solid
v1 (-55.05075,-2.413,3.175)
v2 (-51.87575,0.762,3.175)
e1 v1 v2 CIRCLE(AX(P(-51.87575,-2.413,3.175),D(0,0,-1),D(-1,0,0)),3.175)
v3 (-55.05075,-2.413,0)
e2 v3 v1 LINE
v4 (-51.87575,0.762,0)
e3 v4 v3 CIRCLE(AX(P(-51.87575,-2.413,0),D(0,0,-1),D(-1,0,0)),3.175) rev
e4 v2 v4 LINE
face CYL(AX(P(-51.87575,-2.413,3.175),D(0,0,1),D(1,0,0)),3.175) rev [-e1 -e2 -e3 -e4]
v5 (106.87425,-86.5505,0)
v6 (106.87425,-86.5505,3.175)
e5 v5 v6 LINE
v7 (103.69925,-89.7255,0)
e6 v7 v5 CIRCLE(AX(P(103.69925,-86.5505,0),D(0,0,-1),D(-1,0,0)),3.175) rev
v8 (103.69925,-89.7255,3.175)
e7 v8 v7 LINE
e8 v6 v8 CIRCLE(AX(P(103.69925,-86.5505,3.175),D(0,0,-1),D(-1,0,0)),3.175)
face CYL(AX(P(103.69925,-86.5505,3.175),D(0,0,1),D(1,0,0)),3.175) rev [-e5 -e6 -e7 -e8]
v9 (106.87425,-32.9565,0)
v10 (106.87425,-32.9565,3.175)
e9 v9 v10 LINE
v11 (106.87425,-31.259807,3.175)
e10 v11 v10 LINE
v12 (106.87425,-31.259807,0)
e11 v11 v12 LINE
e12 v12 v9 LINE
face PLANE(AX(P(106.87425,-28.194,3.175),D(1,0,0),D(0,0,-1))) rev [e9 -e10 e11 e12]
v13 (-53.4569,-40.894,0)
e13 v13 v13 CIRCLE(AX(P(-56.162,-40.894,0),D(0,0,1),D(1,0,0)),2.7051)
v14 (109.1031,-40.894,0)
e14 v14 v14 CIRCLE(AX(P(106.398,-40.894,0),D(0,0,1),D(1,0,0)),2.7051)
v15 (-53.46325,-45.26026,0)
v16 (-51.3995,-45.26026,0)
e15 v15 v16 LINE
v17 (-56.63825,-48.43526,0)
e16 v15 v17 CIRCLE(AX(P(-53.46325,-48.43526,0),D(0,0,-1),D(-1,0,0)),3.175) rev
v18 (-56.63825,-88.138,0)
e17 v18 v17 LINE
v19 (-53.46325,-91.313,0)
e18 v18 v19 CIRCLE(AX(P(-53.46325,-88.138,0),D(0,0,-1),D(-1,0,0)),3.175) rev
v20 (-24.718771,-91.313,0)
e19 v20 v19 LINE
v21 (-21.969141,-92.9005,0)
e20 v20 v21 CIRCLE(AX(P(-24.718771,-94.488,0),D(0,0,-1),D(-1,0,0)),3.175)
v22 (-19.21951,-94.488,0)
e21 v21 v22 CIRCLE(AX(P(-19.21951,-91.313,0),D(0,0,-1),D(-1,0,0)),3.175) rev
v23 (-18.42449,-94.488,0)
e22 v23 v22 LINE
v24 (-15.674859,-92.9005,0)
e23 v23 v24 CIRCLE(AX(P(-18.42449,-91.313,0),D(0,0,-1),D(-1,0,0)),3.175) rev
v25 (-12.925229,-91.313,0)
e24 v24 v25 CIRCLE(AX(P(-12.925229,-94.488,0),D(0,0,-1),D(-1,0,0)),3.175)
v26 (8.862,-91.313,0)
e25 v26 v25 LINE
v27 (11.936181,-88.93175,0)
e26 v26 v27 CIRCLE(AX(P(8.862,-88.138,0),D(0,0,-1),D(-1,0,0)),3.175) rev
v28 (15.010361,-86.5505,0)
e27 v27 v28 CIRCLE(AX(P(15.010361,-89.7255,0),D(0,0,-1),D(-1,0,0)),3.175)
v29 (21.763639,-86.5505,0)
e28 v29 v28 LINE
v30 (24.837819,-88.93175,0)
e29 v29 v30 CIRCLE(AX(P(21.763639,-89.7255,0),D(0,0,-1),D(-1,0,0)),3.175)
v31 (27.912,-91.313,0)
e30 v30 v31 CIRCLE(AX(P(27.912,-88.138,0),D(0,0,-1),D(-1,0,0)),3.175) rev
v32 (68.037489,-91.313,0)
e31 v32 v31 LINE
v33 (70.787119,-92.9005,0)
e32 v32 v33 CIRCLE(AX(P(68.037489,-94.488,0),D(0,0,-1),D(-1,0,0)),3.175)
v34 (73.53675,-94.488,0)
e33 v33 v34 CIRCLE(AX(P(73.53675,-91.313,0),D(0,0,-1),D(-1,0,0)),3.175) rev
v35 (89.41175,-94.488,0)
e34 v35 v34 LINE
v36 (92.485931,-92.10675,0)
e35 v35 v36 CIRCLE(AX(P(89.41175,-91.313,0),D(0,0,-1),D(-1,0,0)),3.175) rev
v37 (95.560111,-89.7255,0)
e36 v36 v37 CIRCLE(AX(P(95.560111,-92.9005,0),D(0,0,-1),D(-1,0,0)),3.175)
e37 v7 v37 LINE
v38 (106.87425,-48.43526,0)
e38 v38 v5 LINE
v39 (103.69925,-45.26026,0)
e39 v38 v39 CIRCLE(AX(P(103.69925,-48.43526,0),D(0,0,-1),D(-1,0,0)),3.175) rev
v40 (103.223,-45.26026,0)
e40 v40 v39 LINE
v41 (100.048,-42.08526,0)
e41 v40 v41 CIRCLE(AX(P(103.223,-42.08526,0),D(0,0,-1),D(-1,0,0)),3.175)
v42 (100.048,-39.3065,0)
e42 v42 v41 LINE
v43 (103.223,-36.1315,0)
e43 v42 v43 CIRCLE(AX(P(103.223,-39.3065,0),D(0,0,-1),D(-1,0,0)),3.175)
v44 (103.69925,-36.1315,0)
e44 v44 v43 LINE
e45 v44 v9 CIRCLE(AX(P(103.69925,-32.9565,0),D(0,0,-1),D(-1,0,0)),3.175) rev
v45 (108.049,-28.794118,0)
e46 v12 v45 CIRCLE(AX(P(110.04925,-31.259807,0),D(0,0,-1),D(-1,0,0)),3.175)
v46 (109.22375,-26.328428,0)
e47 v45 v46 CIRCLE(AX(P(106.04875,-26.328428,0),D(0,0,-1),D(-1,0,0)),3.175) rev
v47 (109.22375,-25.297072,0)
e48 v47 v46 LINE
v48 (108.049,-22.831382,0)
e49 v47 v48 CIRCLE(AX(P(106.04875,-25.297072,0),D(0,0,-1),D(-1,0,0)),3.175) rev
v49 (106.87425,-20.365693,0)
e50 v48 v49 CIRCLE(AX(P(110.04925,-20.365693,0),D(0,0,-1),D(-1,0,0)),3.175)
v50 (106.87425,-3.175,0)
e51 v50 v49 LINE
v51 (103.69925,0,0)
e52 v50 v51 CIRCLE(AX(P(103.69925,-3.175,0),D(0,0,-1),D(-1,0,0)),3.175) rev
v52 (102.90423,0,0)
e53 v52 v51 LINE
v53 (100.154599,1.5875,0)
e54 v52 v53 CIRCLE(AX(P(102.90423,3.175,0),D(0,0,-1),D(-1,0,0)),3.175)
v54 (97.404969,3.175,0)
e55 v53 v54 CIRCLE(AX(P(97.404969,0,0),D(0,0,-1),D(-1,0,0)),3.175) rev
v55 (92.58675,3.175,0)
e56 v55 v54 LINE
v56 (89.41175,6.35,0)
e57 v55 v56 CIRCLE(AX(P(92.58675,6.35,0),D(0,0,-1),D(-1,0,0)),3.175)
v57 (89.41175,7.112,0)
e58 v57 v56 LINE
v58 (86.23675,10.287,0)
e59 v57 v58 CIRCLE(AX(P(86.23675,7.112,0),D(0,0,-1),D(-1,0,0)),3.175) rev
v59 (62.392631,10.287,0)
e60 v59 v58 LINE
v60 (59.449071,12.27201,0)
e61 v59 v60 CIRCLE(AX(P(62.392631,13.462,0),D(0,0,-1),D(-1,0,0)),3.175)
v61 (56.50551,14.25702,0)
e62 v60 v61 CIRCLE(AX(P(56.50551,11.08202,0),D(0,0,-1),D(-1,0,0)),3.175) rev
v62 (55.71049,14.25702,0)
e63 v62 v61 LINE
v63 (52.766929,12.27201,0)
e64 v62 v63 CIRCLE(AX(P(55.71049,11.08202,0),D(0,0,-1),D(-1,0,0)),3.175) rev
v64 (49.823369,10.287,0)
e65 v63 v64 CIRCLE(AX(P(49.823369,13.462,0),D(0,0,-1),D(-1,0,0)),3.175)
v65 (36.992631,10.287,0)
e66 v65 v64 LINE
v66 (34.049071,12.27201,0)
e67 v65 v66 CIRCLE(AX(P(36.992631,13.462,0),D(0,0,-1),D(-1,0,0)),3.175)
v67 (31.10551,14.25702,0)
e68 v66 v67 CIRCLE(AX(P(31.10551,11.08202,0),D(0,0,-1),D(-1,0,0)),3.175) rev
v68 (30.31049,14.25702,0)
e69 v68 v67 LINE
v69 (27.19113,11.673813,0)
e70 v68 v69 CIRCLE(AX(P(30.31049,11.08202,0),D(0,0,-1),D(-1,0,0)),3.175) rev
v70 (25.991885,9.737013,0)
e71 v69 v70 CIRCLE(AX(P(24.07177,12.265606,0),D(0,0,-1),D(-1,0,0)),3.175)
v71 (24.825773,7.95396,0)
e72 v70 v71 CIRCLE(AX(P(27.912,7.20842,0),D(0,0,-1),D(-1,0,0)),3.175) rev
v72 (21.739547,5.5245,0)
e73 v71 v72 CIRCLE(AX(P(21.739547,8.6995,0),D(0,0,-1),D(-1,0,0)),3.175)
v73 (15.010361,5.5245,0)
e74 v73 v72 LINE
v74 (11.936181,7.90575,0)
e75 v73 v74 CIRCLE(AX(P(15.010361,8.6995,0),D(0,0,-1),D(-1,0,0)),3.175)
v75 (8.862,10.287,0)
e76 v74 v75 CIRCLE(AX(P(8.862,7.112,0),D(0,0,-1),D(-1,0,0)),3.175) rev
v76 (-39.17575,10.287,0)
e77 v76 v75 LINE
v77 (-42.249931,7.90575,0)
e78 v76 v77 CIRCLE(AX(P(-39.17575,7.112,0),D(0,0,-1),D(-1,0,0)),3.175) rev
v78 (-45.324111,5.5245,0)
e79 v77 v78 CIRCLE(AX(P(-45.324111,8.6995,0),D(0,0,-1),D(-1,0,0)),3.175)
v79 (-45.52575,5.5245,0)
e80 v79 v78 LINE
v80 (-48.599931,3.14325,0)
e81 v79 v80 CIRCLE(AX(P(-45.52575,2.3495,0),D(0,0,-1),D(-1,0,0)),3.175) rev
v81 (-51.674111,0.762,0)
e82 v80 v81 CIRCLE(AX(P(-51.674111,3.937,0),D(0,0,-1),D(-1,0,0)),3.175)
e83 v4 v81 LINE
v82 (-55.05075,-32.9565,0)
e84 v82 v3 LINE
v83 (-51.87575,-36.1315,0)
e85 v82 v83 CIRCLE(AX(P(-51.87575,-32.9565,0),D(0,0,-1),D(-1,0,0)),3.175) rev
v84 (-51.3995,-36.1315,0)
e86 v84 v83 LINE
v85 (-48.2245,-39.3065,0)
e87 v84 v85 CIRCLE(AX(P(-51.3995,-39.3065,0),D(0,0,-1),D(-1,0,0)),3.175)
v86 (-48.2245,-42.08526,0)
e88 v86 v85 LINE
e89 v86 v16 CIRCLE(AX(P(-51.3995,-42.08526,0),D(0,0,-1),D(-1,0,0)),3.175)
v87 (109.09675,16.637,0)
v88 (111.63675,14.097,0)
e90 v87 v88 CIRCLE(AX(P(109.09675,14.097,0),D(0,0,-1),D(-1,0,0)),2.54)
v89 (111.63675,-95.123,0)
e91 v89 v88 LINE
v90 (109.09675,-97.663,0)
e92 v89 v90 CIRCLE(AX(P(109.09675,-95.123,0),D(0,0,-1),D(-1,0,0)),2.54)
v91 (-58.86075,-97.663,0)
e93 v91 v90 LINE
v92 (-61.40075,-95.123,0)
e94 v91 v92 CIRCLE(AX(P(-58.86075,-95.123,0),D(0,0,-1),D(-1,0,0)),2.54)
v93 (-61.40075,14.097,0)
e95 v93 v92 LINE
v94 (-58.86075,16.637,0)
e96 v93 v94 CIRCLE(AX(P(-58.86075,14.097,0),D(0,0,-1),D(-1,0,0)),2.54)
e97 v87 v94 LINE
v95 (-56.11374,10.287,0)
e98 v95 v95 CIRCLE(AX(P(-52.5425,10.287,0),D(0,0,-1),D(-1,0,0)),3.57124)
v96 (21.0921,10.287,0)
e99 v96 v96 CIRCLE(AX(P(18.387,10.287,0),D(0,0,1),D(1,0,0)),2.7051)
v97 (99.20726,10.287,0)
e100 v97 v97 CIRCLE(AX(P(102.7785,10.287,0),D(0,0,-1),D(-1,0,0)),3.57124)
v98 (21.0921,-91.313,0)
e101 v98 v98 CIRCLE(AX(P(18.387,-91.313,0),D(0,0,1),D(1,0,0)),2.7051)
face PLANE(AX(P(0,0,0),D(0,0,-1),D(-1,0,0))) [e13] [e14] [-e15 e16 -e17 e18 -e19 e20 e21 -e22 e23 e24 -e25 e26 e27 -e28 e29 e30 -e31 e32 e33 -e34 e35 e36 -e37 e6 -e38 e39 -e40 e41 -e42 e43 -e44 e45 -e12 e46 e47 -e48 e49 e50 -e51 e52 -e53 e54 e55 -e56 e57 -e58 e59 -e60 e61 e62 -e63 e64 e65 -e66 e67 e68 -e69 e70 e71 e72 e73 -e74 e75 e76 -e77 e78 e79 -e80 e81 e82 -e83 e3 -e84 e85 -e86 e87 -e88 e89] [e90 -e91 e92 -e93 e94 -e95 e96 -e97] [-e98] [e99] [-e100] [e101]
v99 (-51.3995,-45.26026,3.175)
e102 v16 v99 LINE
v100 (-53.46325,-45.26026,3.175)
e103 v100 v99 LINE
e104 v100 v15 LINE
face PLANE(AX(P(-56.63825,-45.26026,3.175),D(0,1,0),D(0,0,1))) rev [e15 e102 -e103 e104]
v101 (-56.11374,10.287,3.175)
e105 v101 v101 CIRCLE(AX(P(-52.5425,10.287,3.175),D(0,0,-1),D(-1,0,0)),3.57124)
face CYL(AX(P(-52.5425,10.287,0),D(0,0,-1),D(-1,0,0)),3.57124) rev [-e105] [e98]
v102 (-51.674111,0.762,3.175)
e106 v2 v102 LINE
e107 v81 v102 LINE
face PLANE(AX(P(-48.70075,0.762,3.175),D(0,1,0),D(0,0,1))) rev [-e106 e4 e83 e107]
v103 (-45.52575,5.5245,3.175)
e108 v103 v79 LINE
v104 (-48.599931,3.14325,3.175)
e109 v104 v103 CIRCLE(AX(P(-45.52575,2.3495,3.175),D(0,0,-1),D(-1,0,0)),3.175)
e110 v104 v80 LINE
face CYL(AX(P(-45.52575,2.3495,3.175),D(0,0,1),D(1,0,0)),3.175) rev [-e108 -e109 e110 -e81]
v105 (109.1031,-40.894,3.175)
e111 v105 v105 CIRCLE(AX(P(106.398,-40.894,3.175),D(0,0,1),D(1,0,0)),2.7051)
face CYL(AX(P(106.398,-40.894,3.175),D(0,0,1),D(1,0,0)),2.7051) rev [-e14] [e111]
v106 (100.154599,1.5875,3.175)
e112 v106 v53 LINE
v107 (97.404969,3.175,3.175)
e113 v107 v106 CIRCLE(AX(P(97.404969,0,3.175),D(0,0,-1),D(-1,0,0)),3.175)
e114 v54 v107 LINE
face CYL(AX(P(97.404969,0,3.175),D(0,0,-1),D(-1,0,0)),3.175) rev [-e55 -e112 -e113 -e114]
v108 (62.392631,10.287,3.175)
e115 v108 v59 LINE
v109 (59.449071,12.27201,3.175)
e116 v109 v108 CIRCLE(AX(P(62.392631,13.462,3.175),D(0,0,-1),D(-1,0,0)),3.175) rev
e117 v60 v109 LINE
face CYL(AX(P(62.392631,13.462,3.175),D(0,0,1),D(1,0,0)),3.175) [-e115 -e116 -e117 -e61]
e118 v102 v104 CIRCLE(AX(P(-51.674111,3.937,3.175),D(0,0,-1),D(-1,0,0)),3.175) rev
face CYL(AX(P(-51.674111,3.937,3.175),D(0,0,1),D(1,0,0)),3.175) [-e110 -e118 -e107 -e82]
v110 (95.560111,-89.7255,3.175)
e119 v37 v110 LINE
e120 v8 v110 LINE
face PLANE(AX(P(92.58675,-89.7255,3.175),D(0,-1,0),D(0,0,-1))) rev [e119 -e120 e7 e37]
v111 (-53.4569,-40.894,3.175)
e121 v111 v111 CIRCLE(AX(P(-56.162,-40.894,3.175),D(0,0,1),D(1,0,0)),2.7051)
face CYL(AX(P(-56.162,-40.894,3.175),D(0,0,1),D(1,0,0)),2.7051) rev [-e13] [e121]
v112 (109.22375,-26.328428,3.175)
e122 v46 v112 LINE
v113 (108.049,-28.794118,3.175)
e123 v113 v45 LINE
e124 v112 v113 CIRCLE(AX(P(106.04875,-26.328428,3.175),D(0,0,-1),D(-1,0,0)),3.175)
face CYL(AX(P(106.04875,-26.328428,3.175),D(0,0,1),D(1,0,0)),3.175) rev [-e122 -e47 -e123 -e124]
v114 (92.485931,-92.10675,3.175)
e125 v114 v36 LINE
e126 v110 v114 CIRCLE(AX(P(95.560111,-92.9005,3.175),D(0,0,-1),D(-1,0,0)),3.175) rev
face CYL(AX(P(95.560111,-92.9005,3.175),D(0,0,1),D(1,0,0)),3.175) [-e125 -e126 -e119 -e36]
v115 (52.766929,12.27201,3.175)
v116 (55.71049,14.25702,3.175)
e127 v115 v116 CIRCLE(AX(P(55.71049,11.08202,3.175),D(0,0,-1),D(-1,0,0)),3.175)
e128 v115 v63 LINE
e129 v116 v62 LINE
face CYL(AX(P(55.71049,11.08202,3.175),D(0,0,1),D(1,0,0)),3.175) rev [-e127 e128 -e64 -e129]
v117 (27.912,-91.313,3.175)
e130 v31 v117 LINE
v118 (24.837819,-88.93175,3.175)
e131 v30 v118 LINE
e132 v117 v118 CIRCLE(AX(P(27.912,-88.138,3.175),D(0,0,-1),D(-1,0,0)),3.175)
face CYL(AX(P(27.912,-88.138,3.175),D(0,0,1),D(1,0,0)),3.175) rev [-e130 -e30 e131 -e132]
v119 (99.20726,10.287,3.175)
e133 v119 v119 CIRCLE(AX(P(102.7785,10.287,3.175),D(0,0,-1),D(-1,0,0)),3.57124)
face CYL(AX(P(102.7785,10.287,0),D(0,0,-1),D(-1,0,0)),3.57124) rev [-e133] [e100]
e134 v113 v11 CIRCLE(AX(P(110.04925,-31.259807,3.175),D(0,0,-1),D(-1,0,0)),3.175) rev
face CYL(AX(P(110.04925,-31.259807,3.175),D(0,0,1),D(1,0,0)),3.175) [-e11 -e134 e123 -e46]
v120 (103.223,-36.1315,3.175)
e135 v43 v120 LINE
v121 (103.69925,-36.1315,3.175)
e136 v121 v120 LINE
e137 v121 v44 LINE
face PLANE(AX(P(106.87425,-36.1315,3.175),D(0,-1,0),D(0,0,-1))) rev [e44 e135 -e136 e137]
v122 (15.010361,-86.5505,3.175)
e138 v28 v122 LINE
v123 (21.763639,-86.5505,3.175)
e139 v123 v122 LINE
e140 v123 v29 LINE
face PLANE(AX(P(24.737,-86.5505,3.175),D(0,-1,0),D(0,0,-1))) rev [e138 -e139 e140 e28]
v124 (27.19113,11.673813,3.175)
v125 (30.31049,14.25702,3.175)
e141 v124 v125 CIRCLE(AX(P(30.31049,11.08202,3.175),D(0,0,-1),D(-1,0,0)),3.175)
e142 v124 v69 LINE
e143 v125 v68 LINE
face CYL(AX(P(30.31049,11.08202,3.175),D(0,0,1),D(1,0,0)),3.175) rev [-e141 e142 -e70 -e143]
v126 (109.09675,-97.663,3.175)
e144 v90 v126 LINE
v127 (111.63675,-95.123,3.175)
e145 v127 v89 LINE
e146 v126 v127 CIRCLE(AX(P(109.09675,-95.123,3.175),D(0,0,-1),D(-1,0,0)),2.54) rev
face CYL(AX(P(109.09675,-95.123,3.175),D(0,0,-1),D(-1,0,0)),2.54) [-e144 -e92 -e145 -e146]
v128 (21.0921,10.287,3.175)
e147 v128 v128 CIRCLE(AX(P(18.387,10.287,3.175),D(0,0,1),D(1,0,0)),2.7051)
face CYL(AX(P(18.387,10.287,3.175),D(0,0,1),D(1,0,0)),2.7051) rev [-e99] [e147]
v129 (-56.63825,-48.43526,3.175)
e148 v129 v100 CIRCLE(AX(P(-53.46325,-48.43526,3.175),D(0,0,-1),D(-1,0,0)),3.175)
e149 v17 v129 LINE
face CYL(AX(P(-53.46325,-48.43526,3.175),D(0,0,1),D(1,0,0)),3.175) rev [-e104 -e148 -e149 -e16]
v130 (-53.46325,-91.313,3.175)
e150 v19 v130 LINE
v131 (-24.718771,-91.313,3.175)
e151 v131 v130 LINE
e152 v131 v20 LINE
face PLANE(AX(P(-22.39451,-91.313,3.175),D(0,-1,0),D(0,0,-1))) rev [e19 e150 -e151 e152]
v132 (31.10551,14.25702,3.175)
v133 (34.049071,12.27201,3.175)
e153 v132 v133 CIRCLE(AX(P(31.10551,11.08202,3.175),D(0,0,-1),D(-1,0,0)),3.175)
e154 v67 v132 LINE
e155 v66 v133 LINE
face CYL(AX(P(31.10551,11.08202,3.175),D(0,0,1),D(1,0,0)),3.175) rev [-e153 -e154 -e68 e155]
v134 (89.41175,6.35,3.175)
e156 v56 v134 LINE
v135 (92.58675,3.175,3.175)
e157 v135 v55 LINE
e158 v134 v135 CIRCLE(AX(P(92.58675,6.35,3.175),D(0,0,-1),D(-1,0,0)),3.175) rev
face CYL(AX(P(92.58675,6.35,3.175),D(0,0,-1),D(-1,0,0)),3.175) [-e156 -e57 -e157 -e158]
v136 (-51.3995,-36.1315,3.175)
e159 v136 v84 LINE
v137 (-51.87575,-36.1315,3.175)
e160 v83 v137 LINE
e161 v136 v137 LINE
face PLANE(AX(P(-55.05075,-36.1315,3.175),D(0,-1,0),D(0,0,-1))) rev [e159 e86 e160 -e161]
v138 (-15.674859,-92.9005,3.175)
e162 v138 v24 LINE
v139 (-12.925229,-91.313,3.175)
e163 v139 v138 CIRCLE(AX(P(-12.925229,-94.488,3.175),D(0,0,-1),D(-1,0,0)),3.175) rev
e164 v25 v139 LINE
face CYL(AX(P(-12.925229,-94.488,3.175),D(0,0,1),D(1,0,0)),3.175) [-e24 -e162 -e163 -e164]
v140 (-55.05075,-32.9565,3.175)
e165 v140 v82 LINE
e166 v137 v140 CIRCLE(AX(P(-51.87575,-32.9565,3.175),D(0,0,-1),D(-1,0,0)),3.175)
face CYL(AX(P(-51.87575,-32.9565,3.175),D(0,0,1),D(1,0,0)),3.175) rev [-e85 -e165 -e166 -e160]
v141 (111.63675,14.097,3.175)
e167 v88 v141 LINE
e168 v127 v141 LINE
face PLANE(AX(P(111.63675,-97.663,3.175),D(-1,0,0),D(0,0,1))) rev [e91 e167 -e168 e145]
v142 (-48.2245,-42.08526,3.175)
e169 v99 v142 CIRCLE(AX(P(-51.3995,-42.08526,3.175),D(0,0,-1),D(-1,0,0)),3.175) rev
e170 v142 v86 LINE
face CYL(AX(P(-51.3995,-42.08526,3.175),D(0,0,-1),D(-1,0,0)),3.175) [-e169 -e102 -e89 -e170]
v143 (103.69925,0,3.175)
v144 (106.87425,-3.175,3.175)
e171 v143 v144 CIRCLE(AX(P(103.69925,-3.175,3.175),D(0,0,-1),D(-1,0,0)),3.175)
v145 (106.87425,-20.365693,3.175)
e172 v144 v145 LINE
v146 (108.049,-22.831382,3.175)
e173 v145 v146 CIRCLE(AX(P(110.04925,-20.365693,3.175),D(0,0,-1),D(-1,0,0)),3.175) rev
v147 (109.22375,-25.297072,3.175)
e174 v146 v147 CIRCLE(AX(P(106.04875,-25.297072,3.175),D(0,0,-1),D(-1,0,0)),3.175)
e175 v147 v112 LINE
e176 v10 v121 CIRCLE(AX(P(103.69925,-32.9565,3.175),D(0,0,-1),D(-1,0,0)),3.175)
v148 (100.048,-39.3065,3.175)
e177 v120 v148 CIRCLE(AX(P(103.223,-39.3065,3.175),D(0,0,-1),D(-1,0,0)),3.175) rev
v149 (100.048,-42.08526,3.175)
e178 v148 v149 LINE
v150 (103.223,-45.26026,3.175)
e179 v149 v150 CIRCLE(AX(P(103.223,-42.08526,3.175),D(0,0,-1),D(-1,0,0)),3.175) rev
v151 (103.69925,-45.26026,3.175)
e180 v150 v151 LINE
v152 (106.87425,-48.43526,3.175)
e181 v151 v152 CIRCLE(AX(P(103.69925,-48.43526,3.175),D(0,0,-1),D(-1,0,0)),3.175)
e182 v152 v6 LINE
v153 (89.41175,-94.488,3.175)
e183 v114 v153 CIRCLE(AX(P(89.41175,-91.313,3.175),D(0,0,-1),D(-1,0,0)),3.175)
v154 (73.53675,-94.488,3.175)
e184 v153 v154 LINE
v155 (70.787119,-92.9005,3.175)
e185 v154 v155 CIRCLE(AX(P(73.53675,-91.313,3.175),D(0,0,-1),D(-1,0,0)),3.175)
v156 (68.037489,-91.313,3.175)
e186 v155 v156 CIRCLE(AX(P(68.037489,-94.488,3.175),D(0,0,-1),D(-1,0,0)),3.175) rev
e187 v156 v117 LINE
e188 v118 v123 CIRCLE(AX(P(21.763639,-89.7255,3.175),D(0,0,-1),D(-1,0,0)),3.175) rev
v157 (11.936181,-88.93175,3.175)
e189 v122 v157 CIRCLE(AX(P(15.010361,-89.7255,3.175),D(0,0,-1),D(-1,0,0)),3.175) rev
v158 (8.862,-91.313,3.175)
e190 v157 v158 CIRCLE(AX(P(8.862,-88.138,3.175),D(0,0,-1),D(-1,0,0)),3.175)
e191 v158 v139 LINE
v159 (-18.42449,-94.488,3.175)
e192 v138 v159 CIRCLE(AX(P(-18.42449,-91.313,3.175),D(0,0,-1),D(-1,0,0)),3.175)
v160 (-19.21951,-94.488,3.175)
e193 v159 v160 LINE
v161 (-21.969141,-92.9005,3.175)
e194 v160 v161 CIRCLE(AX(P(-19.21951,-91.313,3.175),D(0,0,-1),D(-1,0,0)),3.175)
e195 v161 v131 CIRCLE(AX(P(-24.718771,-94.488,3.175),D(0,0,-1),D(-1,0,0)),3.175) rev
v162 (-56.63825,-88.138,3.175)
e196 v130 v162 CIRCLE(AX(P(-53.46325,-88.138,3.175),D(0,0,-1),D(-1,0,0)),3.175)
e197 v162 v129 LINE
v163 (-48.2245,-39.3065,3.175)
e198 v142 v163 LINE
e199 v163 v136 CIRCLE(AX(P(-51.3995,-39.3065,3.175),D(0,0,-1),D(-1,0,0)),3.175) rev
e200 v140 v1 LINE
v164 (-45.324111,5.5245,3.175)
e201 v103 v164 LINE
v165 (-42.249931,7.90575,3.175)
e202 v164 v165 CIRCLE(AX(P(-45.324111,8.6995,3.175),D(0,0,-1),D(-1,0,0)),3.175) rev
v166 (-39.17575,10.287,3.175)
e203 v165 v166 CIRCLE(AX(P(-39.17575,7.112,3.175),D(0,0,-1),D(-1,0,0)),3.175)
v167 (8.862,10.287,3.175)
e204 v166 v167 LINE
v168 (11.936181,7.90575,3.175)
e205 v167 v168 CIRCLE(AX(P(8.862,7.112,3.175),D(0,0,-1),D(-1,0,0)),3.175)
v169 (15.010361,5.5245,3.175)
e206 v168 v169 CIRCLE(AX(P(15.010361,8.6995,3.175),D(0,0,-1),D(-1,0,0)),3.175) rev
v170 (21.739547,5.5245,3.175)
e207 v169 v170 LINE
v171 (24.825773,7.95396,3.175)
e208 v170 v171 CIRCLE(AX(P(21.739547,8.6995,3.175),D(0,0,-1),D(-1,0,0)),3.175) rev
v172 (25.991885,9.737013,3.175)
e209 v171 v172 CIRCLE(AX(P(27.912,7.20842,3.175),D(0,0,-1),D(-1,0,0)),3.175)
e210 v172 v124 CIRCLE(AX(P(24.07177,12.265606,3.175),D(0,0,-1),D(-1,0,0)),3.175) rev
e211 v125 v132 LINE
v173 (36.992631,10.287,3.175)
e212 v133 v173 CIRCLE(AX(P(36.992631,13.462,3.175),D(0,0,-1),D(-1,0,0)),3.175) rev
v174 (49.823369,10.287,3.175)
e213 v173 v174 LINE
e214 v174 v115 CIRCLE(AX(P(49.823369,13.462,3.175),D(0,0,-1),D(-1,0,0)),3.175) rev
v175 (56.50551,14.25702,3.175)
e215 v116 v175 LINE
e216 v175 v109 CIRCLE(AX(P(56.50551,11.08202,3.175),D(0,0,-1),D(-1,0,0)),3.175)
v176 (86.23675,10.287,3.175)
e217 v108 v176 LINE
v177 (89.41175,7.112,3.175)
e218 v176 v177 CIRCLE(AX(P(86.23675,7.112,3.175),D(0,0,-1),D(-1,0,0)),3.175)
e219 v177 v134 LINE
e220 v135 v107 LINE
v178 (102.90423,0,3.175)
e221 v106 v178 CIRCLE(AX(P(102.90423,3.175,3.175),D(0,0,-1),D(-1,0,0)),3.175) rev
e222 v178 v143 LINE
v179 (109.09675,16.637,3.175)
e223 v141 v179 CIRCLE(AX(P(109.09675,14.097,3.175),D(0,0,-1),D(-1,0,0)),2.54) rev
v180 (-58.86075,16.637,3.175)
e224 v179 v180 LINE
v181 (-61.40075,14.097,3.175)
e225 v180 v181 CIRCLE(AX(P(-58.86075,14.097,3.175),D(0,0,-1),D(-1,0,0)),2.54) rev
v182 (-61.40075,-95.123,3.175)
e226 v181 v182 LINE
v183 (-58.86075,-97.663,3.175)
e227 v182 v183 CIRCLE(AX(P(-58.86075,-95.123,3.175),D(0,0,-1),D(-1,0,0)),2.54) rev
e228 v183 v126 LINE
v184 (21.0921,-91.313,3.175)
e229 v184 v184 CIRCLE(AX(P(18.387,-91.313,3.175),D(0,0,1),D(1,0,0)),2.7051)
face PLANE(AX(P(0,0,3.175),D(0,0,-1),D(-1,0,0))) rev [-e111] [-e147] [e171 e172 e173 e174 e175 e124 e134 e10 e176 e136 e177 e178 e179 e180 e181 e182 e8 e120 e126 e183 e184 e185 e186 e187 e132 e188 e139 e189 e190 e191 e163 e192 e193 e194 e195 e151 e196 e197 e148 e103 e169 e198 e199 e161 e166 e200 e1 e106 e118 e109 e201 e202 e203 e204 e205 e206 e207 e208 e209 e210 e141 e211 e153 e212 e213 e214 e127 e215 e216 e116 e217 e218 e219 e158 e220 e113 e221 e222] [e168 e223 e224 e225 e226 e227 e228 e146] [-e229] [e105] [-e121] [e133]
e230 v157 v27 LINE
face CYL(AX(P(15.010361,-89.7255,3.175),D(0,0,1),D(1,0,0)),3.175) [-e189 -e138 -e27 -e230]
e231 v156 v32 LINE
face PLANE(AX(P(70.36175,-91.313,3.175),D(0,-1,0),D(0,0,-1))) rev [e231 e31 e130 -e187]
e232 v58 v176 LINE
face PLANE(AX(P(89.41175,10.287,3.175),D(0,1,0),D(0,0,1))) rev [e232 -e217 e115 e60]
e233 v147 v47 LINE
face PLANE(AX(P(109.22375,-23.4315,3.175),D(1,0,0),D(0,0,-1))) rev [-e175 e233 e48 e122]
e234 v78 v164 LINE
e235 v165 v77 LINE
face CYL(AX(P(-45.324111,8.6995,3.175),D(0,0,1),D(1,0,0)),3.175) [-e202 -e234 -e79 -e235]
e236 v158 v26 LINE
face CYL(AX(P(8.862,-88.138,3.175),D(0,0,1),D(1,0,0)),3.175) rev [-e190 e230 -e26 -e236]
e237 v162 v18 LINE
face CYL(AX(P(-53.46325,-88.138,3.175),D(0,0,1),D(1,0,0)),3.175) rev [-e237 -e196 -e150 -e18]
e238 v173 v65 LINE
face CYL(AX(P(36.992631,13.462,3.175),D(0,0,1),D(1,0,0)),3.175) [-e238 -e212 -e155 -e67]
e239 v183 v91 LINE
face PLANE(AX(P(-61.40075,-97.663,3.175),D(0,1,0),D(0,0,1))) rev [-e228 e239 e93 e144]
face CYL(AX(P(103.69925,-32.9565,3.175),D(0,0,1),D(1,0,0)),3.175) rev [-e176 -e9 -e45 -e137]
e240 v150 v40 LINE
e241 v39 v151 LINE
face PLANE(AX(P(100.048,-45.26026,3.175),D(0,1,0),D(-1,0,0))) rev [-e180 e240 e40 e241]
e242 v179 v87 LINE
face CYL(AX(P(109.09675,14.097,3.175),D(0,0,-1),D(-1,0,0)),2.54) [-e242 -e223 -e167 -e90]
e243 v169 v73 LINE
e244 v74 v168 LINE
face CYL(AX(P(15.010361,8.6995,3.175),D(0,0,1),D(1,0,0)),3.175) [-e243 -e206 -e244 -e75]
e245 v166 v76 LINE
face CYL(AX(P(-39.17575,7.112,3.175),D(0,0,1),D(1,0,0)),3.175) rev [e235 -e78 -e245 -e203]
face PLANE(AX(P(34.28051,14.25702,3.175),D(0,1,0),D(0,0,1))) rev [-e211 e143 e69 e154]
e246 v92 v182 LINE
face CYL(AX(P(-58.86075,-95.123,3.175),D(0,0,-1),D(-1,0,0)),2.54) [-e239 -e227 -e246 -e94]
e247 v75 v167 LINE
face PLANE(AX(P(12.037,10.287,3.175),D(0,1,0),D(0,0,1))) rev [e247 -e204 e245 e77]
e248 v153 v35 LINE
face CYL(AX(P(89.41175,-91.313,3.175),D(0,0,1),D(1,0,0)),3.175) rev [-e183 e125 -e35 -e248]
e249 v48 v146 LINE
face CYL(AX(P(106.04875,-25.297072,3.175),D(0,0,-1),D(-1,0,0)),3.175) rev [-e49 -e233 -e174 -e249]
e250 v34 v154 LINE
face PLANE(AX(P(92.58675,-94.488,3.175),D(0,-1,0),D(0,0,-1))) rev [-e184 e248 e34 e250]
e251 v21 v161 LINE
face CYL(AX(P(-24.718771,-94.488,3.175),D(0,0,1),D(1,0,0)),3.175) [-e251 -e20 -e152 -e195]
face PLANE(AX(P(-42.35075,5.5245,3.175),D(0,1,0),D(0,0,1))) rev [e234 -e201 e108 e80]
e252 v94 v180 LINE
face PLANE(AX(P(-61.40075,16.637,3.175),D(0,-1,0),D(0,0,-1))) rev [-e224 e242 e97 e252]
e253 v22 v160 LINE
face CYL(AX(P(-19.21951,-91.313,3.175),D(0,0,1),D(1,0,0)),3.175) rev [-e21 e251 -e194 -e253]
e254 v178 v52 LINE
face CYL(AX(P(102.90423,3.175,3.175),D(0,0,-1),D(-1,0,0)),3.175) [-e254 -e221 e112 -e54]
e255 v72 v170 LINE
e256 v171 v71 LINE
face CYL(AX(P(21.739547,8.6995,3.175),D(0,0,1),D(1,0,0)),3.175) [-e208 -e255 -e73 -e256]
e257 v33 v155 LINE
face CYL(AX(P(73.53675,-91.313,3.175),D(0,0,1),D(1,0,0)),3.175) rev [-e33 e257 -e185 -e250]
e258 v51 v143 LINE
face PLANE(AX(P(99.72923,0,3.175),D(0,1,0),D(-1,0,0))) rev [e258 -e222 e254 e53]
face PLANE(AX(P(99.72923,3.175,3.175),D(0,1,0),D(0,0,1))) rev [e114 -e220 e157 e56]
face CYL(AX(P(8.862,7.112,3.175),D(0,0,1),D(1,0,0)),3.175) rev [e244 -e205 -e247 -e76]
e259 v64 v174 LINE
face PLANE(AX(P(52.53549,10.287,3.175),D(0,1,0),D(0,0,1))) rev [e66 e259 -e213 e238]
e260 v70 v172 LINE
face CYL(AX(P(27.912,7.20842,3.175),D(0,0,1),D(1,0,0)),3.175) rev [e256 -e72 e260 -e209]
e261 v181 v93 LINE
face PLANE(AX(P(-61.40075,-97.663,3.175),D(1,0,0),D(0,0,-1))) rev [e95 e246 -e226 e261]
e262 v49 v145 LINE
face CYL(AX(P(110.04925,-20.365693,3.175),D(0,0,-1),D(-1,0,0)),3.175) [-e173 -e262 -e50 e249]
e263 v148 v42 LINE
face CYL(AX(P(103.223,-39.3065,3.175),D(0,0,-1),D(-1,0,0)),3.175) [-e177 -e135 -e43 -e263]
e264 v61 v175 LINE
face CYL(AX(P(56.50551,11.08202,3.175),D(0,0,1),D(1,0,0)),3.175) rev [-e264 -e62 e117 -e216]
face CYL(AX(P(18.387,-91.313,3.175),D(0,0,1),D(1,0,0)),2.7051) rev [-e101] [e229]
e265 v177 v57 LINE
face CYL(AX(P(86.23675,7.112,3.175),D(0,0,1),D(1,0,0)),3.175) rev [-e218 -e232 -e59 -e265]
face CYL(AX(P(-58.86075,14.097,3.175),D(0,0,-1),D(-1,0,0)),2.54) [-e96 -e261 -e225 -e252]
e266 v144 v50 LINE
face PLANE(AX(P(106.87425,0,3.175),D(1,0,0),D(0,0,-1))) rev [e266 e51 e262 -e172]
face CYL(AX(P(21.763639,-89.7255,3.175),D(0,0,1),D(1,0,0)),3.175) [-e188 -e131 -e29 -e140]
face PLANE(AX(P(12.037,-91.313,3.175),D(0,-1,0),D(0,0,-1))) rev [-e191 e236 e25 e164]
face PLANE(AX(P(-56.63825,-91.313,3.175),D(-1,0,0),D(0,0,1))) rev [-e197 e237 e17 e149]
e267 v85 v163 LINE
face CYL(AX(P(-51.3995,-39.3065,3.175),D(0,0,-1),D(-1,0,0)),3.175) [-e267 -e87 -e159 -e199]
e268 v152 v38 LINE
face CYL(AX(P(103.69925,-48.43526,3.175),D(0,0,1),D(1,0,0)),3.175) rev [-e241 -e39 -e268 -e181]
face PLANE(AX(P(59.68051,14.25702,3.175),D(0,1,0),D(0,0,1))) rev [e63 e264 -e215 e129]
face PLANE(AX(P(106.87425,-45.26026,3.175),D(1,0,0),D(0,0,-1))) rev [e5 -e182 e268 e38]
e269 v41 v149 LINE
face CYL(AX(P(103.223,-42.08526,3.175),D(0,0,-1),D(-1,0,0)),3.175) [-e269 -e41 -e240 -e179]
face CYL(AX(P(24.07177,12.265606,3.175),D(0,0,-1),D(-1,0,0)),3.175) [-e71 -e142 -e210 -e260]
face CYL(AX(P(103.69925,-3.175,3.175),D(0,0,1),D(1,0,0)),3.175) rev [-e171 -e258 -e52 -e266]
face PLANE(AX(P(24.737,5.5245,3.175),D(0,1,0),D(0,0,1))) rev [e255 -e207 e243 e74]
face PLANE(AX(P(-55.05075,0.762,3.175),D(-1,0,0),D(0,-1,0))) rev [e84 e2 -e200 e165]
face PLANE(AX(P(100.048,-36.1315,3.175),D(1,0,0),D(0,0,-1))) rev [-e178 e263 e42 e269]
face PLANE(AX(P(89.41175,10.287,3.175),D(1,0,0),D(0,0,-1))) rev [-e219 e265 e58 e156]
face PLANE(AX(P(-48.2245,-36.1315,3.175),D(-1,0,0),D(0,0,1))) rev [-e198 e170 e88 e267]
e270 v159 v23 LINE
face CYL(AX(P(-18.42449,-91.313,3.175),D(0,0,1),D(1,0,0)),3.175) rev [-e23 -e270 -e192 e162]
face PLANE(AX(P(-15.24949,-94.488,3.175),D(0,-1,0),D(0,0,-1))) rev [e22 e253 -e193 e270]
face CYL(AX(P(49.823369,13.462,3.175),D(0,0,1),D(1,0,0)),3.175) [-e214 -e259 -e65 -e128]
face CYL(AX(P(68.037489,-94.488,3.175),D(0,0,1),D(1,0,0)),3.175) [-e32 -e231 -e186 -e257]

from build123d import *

# Parameters (mm, degrees)
SKETCH1_W                  = 173.0375
SKETCH1_H                  = 114.3
BOSS_EXTRUDE1_DEPTH        = 3.175
SKETCH3_R                  = 3.175
SKETCH3_R_2                = 3.7703125
CUT_EXTRUDE1_DEPTH         = 149.360729792
F_6_CLEARANCE_HOLE1_D      = 4.3053
F_3_0_213_DIAMETER_HOLE1_D = 5.4102
F_1_4_CLEARANCE_HOLE1_D    = 7.14248
CUT_EXTRUDE5_REACH         = 150.361
SKETCH16_R                 = 1.190625
CUT_EXTRUDE6_DEPTH         = 149.360729792
FILLET5_R                  = 3.175
FILLET6_R                  = 3.175
FILLET7_R                  = 2.54


with BuildPart() as part:
    # Sketch1 → Boss-Extrude1 (new body)
    with BuildSketch(Plane.XY):
        with Locations((25.118, -40.513)):
            Rectangle(SKETCH1_W, SKETCH1_H)
    extrude(amount=BOSS_EXTRUDE1_DEPTH)

    # Sketch3 → Cut-Extrude1 (cut, through all)
    with BuildSketch(Plane.XY.offset(3.175)):
        with Locations((100.302, -26.543)):
            Circle(SKETCH3_R)
        with Locations((99.413, -51.6255)):
            Circle(SKETCH3_R_2)
        with Locations((-47.907, -51.6255)):
            Circle(SKETCH3_R_2)
        with Locations((-47.907, -6.5405)):
            Circle(SKETCH3_R_2)
    extrude(amount=-CUT_EXTRUDE1_DEPTH, mode=Mode.SUBTRACT)

    # #6 Clearance Hole1 (through all)
    with Locations(Plane.XY.offset(3.175)):
        with Locations((18.387, 10.287), (-56.162, -40.894), (106.398, -40.894), (18.387, -91.313)):
            Hole(F_6_CLEARANCE_HOLE1_D / 2)

    # #3 (0.213) Diameter Hole1 (through all)
    with Locations(Plane(origin=(18.387, 10.287, 3.175), x_dir=(1, 0, 0), z_dir=(0, 0, 1))):
        with Locations((0, 0), (-74.549, -51.181), (0, -101.6), (88.011, -51.181)):
            Hole(F_3_0_213_DIAMETER_HOLE1_D / 2)

    # 1/4 Clearance Hole1 (through all)
    with Locations(Plane(origin=(0, 0, 0), x_dir=(-1, 0, 0), z_dir=(0, 0, -1))):
        with Locations((-102.7785, 10.287), (52.5425, 10.287)):
            Hole(F_1_4_CLEARANCE_HOLE1_D / 2)

    # Sketch16 → Cut-Extrude5 (cut, up to next)
    with BuildSketch(Plane(origin=(0, 0, 0), x_dir=(-1, 0, 0), z_dir=(0, 0, -1)), mode=Mode.PRIVATE) as cut_extrude5_sk1:
        with Locations((-98.142490655, -57.489441166)):
            Circle(SKETCH16_R)
    cut_extrude5_tool1 = extrude(cut_extrude5_sk1.sketch, amount=-CUT_EXTRUDE5_REACH, mode=Mode.PRIVATE) & part.part
    # Sketch16 → Cut-Extrude5 (cut, up to next)
    with BuildSketch(Plane(origin=(0, 0, 0), x_dir=(-1, 0, 0), z_dir=(0, 0, -1)), mode=Mode.PRIVATE) as cut_extrude5_sk2:
        with Locations((49.177509345, -57.489441166)):
            Circle(SKETCH16_R)
    cut_extrude5_tool2 = extrude(cut_extrude5_sk2.sketch, amount=-CUT_EXTRUDE5_REACH, mode=Mode.PRIVATE) & part.part
    # Sketch16 → Cut-Extrude5 (cut, up to next)
    with BuildSketch(Plane(origin=(0, 0, 0), x_dir=(-1, 0, 0), z_dir=(0, 0, -1)), mode=Mode.PRIVATE) as cut_extrude5_sk3:
        with Locations((49.177509345, -12.404441166)):
            Circle(SKETCH16_R)
    cut_extrude5_tool3 = extrude(cut_extrude5_sk3.sketch, amount=-CUT_EXTRUDE5_REACH, mode=Mode.PRIVATE) & part.part
    add(cut_extrude5_tool1.solids().sort_by_distance((98.142491, -57.489441, 0))[0], mode=Mode.SUBTRACT)
    add(cut_extrude5_tool2.solids().sort_by_distance((-49.177509, -57.489441, 0))[0], mode=Mode.SUBTRACT)
    add(cut_extrude5_tool3.solids().sort_by_distance((-49.177509, -12.404441, 0))[0], mode=Mode.SUBTRACT)

    # Sketch17 → Cut-Extrude6 (cut, through all)
    with BuildSketch(Plane(origin=(0, 0, 0), x_dir=(-1, 0, 0), z_dir=(0, 0, -1))):
        Polygon((-89.41175, 10.287), (-59.68051, 10.287), (-59.68051, 14.25702), (-52.53549, 14.25702), (-52.53549, 10.287), (-34.28051, 10.287), (-34.28051, 14.25702), (-27.13549, 14.25702), (-27.13549, 10.287), (-24.737, 10.287), (-24.737, 5.5245), (-12.037, 5.5245), (-12.037, 10.287), (42.35075, 10.287), (42.35075, 5.5245), (48.70075, 5.5245), (48.70075, 0.762), (55.05075, 0.762), (55.05075, -36.1315), (48.2245, -36.1315), (48.2245, -45.26026), (56.63825, -45.26026), (56.63825, -91.313), (22.39451, -91.313), (22.39451, -94.488), (15.24949, -94.488), (15.24949, -91.313), (-12.037, -91.313), (-12.037, -86.5505), (-24.737, -86.5505), (-24.737, -91.313), (-70.36175, -91.313), (-70.36175, -94.488), (-92.58675, -94.488), (-92.58675, -89.7255), (-106.87425, -89.7255), (-106.87425, -45.26026), (-100.048, -45.26026), (-100.048, -36.1315), (-106.87425, -36.1315), (-106.87425, -28.194), (-109.22375, -28.194), (-109.22375, -23.4315), (-106.87425, -23.4315), (-106.87425, 0), (-99.72923, 0), (-99.72923, 3.175), (-89.41175, 3.175), align=None)
    extrude(amount=-CUT_EXTRUDE6_DEPTH, mode=Mode.SUBTRACT)

    # Fillet5
    # the kernel refuses this fillet: 3.175 mm, written as the material it adds along each edge
    with BuildSketch(Plane(origin=(106.87425, 0, 0), x_dir=(0, -1, 0), z_dir=(0, 0, 1)), Plane(origin=(106.87425, -45.26026, 0), x_dir=(0, -1, 0), z_dir=(0, 0, 1)), Plane(origin=(106.87425, -36.1315, 0), x_dir=(-1, 0, 0), z_dir=(0, 0, 1)), Plane(origin=(106.87425, -89.7255, 0), x_dir=(-1, 0, 0), z_dir=(0, 0, 1)), Plane(origin=(92.58675, -94.488, 0), x_dir=(-1, 0, 0), z_dir=(0, 0, 1)), Plane(origin=(70.36175, -94.488, 0), x_dir=(0, 1, 0), z_dir=(0, 0, 1)), Plane(origin=(24.737, -91.313, 0), x_dir=(0, 1, 0), z_dir=(0, 0, 1)), Plane(origin=(12.037, -91.313, 0), x_dir=(-1, 0, 0), z_dir=(0, 0, 1)), Plane(origin=(-15.24949, -94.488, 0), x_dir=(-1, 0, 0), z_dir=(0, 0, 1)), Plane(origin=(-22.39451, -94.488, 0), x_dir=(0, 1, 0), z_dir=(0, 0, 1)), Plane(origin=(-56.63825, -91.313, 0), x_dir=(0, 1, 0), z_dir=(0, 0, 1)), Plane(origin=(-55.05075, -36.1315, 0), x_dir=(0, 1, 0), z_dir=(0, 0, 1)), Plane(origin=(-56.63825, -45.26026, 0), x_dir=(1, 0, 0), z_dir=(0, 0, 1)), Plane(origin=(-55.05075, 0.762, 0), x_dir=(1, 0, 0), z_dir=(0, 0, 1)), Plane(origin=(-48.70075, 5.5245, 0), x_dir=(1, 0, 0), z_dir=(0, 0, 1)), Plane(origin=(-42.35075, 10.287, 0), x_dir=(1, 0, 0), z_dir=(0, 0, 1)), Plane(origin=(12.037, 10.287, 0), x_dir=(0, -1, 0), z_dir=(0, 0, 1)), Plane(origin=(34.28051, 14.25702, 0), x_dir=(0, -1, 0), z_dir=(0, 0, 1)), Plane(origin=(27.13549, 14.25702, 0), x_dir=(1, 0, 0), z_dir=(0, 0, 1)), Plane(origin=(52.53549, 14.25702, 0), x_dir=(1, 0, 0), z_dir=(0, 0, 1)), Plane(origin=(59.68051, 14.25702, 0), x_dir=(0, -1, 0), z_dir=(0, 0, 1))) as fillet5_piece_1:
        with BuildLine():
            CenterArc((FILLET5_R, -FILLET5_R), FILLET5_R, 90, 90)
            Line((0, -FILLET5_R), (-FILLET5_R * 0.02, -FILLET5_R))
            Line((-FILLET5_R * 0.02, -FILLET5_R), (-FILLET5_R * 0.02, FILLET5_R * 0.02))
            Line((-FILLET5_R * 0.02, FILLET5_R * 0.02), (FILLET5_R, FILLET5_R * 0.02))
            Line((FILLET5_R, FILLET5_R * 0.02), (FILLET5_R, 0))
        make_face()
    extrude(amount=3.175)
    with BuildSketch(Plane(origin=(24.737, 10.287, 0), x_dir=(1, 0, 0), z_dir=(0, 0, 1))) as fillet5_piece_2:
        with BuildLine():
            CenterArc((3.175, -3.07858039), FILLET5_R, 104.15642815, 75.84357185)
            Line((0, -3.07858039), (-0.0635, -3.07858039))
            Line((-0.0635, -3.07858039), (-0.0635, 0))
            Line((-0.0635, 0), (0, 0.0635))
            ThreePointArc((0, 0.0635), (1.199245, 0.0635), (2.3829598, 0.061571608))
            Line((2.3829598, 0.061571608), (2.39849, 0))
        make_face()
    extrude(amount=3.175)
    with BuildSketch(Plane(origin=(89.41175, 10.287, 0), x_dir=(-1, 0, 0), z_dir=(0, 0, 1))) as fillet5_piece_3:
        with BuildLine():
            CenterArc((FILLET5_R, FILLET5_R), FILLET5_R, 180, 90)
            Line((0, FILLET5_R), (-FILLET5_R * 0.02, FILLET5_R))
            Line((-FILLET5_R * 0.02, FILLET5_R), (-FILLET5_R * 0.02, -FILLET5_R * 0.02))
            Line((-FILLET5_R * 0.02, -FILLET5_R * 0.02), (FILLET5_R, -FILLET5_R * 0.02))
            Line((FILLET5_R, -FILLET5_R * 0.02), (FILLET5_R, 0))
        make_face()
    extrude(amount=3.175)
    # the kernel refuses this fillet: 3.175 mm, written as the material it takes off along each edge
    with BuildSketch(Plane(origin=(99.72923, 0, -7.9375), x_dir=(1, 0, 0), z_dir=(0, 0, 1)), Plane(origin=(89.41175, 3.175, -7.9375), x_dir=(1, 0, 0), z_dir=(0, 0, 1))) as fillet5_2_piece_1:
        with BuildLine():
            CenterArc((FILLET5_R, FILLET5_R), FILLET5_R, 180, 90)
            Line((0, FILLET5_R), (-FILLET5_R * 0.02, FILLET5_R))
            Line((-FILLET5_R * 0.02, FILLET5_R), (-FILLET5_R * 0.02, -FILLET5_R * 0.02))
            Line((-FILLET5_R * 0.02, -FILLET5_R * 0.02), (FILLET5_R, -FILLET5_R * 0.02))
            Line((FILLET5_R, -FILLET5_R * 0.02), (FILLET5_R, 0))
        make_face()
    extrude(amount=19.05, mode=Mode.SUBTRACT)
    with BuildSketch(Plane(origin=(106.87425, -23.4315, -7.664518392), x_dir=(1, 0, 0), z_dir=(0, 0, 1))) as fillet5_2_piece_2:
        with BuildLine():
            CenterArc((3.175, 3.065807357), FILLET5_R, 180, 74.929937855)
            Line((0, 3.065807357), (-0.0635, 3.065807357))
            Line((-0.0635, 3.065807357), (-0.0635, 0))
            Line((-0.0635, 0), (0, -0.0635))
            ThreePointArc((0, -0.0635), (1.17475, -0.0635), (2.33299, -0.061316147))
            Line((2.33299, -0.061316147), (2.3495, 0))
        make_face()
    extrude(amount=18.504036785, mode=Mode.SUBTRACT)
    with BuildSketch(Plane(origin=(106.87425, -28.194, -7.664518392), x_dir=(0, -1, 0), z_dir=(0, 0, 1))) as fillet5_2_piece_3:
        with BuildLine():
            CenterArc((3.065807357, 3.175), FILLET5_R, 195.070062145, 74.929937855)
            Line((0, 2.3495), (-0.061316147, 2.33299))
            ThreePointArc((-0.061316147, 2.33299), (-0.0635, 1.17475), (-0.0635, 0))
            Line((-0.0635, 0), (0, -0.0635))
            Line((0, -0.0635), (3.065807357, -0.0635))
            Line((3.065807357, -0.0635), (3.065807357, 0))
        make_face()
    extrude(amount=18.504036785, mode=Mode.SUBTRACT)

    # Fillet6
    fillet6_edges = [part.edges().sort_by_distance(p)[0] for p in [
        (99.72923, 3.175, 1.5875),
        (59.68051, 10.287, 1.5875),
        (52.53549, 10.287, 1.5875),
        (34.28051, 10.287, 1.5875),
        (27.13549, 10.287, 1.5875),
        (24.737, 5.5245, 1.5875),
        (12.037, 5.5245, 1.5875),
        (-42.35075, 5.5245, 1.5875),
        (-48.70075, 0.762, 1.5875),
        (-48.2245, -36.1315, 1.5875),
        (-48.2245, -45.26026, 1.5875),
        (-22.39451, -91.313, 1.5875),
        (-15.24949, -91.313, 1.5875),
        (12.037, -86.5505, 1.5875),
        (24.737, -86.5505, 1.5875),
        (70.36175, -91.313, 1.5875),
        (92.58675, -89.7255, 1.5875),
        (100.048, -45.26026, 1.5875),
        (100.048, -36.1315, 1.5875),
        (109.22375, -28.194, 1.5875),
        (109.22375, -23.4315, 1.5875),
    ]]
    fillet(fillet6_edges, radius=FILLET6_R)

    # Fillet7
    fillet7_edges = [part.edges().sort_by_distance(p)[0] for p in [
        (-61.40075, 16.637, 1.5875),
        (111.63675, 16.637, 1.5875),
        (111.63675, -97.663, 1.5875),
        (-61.40075, -97.663, 1.5875),
    ]]
    fillet(fillet7_edges, radius=FILLET7_R)


solid = part.part
